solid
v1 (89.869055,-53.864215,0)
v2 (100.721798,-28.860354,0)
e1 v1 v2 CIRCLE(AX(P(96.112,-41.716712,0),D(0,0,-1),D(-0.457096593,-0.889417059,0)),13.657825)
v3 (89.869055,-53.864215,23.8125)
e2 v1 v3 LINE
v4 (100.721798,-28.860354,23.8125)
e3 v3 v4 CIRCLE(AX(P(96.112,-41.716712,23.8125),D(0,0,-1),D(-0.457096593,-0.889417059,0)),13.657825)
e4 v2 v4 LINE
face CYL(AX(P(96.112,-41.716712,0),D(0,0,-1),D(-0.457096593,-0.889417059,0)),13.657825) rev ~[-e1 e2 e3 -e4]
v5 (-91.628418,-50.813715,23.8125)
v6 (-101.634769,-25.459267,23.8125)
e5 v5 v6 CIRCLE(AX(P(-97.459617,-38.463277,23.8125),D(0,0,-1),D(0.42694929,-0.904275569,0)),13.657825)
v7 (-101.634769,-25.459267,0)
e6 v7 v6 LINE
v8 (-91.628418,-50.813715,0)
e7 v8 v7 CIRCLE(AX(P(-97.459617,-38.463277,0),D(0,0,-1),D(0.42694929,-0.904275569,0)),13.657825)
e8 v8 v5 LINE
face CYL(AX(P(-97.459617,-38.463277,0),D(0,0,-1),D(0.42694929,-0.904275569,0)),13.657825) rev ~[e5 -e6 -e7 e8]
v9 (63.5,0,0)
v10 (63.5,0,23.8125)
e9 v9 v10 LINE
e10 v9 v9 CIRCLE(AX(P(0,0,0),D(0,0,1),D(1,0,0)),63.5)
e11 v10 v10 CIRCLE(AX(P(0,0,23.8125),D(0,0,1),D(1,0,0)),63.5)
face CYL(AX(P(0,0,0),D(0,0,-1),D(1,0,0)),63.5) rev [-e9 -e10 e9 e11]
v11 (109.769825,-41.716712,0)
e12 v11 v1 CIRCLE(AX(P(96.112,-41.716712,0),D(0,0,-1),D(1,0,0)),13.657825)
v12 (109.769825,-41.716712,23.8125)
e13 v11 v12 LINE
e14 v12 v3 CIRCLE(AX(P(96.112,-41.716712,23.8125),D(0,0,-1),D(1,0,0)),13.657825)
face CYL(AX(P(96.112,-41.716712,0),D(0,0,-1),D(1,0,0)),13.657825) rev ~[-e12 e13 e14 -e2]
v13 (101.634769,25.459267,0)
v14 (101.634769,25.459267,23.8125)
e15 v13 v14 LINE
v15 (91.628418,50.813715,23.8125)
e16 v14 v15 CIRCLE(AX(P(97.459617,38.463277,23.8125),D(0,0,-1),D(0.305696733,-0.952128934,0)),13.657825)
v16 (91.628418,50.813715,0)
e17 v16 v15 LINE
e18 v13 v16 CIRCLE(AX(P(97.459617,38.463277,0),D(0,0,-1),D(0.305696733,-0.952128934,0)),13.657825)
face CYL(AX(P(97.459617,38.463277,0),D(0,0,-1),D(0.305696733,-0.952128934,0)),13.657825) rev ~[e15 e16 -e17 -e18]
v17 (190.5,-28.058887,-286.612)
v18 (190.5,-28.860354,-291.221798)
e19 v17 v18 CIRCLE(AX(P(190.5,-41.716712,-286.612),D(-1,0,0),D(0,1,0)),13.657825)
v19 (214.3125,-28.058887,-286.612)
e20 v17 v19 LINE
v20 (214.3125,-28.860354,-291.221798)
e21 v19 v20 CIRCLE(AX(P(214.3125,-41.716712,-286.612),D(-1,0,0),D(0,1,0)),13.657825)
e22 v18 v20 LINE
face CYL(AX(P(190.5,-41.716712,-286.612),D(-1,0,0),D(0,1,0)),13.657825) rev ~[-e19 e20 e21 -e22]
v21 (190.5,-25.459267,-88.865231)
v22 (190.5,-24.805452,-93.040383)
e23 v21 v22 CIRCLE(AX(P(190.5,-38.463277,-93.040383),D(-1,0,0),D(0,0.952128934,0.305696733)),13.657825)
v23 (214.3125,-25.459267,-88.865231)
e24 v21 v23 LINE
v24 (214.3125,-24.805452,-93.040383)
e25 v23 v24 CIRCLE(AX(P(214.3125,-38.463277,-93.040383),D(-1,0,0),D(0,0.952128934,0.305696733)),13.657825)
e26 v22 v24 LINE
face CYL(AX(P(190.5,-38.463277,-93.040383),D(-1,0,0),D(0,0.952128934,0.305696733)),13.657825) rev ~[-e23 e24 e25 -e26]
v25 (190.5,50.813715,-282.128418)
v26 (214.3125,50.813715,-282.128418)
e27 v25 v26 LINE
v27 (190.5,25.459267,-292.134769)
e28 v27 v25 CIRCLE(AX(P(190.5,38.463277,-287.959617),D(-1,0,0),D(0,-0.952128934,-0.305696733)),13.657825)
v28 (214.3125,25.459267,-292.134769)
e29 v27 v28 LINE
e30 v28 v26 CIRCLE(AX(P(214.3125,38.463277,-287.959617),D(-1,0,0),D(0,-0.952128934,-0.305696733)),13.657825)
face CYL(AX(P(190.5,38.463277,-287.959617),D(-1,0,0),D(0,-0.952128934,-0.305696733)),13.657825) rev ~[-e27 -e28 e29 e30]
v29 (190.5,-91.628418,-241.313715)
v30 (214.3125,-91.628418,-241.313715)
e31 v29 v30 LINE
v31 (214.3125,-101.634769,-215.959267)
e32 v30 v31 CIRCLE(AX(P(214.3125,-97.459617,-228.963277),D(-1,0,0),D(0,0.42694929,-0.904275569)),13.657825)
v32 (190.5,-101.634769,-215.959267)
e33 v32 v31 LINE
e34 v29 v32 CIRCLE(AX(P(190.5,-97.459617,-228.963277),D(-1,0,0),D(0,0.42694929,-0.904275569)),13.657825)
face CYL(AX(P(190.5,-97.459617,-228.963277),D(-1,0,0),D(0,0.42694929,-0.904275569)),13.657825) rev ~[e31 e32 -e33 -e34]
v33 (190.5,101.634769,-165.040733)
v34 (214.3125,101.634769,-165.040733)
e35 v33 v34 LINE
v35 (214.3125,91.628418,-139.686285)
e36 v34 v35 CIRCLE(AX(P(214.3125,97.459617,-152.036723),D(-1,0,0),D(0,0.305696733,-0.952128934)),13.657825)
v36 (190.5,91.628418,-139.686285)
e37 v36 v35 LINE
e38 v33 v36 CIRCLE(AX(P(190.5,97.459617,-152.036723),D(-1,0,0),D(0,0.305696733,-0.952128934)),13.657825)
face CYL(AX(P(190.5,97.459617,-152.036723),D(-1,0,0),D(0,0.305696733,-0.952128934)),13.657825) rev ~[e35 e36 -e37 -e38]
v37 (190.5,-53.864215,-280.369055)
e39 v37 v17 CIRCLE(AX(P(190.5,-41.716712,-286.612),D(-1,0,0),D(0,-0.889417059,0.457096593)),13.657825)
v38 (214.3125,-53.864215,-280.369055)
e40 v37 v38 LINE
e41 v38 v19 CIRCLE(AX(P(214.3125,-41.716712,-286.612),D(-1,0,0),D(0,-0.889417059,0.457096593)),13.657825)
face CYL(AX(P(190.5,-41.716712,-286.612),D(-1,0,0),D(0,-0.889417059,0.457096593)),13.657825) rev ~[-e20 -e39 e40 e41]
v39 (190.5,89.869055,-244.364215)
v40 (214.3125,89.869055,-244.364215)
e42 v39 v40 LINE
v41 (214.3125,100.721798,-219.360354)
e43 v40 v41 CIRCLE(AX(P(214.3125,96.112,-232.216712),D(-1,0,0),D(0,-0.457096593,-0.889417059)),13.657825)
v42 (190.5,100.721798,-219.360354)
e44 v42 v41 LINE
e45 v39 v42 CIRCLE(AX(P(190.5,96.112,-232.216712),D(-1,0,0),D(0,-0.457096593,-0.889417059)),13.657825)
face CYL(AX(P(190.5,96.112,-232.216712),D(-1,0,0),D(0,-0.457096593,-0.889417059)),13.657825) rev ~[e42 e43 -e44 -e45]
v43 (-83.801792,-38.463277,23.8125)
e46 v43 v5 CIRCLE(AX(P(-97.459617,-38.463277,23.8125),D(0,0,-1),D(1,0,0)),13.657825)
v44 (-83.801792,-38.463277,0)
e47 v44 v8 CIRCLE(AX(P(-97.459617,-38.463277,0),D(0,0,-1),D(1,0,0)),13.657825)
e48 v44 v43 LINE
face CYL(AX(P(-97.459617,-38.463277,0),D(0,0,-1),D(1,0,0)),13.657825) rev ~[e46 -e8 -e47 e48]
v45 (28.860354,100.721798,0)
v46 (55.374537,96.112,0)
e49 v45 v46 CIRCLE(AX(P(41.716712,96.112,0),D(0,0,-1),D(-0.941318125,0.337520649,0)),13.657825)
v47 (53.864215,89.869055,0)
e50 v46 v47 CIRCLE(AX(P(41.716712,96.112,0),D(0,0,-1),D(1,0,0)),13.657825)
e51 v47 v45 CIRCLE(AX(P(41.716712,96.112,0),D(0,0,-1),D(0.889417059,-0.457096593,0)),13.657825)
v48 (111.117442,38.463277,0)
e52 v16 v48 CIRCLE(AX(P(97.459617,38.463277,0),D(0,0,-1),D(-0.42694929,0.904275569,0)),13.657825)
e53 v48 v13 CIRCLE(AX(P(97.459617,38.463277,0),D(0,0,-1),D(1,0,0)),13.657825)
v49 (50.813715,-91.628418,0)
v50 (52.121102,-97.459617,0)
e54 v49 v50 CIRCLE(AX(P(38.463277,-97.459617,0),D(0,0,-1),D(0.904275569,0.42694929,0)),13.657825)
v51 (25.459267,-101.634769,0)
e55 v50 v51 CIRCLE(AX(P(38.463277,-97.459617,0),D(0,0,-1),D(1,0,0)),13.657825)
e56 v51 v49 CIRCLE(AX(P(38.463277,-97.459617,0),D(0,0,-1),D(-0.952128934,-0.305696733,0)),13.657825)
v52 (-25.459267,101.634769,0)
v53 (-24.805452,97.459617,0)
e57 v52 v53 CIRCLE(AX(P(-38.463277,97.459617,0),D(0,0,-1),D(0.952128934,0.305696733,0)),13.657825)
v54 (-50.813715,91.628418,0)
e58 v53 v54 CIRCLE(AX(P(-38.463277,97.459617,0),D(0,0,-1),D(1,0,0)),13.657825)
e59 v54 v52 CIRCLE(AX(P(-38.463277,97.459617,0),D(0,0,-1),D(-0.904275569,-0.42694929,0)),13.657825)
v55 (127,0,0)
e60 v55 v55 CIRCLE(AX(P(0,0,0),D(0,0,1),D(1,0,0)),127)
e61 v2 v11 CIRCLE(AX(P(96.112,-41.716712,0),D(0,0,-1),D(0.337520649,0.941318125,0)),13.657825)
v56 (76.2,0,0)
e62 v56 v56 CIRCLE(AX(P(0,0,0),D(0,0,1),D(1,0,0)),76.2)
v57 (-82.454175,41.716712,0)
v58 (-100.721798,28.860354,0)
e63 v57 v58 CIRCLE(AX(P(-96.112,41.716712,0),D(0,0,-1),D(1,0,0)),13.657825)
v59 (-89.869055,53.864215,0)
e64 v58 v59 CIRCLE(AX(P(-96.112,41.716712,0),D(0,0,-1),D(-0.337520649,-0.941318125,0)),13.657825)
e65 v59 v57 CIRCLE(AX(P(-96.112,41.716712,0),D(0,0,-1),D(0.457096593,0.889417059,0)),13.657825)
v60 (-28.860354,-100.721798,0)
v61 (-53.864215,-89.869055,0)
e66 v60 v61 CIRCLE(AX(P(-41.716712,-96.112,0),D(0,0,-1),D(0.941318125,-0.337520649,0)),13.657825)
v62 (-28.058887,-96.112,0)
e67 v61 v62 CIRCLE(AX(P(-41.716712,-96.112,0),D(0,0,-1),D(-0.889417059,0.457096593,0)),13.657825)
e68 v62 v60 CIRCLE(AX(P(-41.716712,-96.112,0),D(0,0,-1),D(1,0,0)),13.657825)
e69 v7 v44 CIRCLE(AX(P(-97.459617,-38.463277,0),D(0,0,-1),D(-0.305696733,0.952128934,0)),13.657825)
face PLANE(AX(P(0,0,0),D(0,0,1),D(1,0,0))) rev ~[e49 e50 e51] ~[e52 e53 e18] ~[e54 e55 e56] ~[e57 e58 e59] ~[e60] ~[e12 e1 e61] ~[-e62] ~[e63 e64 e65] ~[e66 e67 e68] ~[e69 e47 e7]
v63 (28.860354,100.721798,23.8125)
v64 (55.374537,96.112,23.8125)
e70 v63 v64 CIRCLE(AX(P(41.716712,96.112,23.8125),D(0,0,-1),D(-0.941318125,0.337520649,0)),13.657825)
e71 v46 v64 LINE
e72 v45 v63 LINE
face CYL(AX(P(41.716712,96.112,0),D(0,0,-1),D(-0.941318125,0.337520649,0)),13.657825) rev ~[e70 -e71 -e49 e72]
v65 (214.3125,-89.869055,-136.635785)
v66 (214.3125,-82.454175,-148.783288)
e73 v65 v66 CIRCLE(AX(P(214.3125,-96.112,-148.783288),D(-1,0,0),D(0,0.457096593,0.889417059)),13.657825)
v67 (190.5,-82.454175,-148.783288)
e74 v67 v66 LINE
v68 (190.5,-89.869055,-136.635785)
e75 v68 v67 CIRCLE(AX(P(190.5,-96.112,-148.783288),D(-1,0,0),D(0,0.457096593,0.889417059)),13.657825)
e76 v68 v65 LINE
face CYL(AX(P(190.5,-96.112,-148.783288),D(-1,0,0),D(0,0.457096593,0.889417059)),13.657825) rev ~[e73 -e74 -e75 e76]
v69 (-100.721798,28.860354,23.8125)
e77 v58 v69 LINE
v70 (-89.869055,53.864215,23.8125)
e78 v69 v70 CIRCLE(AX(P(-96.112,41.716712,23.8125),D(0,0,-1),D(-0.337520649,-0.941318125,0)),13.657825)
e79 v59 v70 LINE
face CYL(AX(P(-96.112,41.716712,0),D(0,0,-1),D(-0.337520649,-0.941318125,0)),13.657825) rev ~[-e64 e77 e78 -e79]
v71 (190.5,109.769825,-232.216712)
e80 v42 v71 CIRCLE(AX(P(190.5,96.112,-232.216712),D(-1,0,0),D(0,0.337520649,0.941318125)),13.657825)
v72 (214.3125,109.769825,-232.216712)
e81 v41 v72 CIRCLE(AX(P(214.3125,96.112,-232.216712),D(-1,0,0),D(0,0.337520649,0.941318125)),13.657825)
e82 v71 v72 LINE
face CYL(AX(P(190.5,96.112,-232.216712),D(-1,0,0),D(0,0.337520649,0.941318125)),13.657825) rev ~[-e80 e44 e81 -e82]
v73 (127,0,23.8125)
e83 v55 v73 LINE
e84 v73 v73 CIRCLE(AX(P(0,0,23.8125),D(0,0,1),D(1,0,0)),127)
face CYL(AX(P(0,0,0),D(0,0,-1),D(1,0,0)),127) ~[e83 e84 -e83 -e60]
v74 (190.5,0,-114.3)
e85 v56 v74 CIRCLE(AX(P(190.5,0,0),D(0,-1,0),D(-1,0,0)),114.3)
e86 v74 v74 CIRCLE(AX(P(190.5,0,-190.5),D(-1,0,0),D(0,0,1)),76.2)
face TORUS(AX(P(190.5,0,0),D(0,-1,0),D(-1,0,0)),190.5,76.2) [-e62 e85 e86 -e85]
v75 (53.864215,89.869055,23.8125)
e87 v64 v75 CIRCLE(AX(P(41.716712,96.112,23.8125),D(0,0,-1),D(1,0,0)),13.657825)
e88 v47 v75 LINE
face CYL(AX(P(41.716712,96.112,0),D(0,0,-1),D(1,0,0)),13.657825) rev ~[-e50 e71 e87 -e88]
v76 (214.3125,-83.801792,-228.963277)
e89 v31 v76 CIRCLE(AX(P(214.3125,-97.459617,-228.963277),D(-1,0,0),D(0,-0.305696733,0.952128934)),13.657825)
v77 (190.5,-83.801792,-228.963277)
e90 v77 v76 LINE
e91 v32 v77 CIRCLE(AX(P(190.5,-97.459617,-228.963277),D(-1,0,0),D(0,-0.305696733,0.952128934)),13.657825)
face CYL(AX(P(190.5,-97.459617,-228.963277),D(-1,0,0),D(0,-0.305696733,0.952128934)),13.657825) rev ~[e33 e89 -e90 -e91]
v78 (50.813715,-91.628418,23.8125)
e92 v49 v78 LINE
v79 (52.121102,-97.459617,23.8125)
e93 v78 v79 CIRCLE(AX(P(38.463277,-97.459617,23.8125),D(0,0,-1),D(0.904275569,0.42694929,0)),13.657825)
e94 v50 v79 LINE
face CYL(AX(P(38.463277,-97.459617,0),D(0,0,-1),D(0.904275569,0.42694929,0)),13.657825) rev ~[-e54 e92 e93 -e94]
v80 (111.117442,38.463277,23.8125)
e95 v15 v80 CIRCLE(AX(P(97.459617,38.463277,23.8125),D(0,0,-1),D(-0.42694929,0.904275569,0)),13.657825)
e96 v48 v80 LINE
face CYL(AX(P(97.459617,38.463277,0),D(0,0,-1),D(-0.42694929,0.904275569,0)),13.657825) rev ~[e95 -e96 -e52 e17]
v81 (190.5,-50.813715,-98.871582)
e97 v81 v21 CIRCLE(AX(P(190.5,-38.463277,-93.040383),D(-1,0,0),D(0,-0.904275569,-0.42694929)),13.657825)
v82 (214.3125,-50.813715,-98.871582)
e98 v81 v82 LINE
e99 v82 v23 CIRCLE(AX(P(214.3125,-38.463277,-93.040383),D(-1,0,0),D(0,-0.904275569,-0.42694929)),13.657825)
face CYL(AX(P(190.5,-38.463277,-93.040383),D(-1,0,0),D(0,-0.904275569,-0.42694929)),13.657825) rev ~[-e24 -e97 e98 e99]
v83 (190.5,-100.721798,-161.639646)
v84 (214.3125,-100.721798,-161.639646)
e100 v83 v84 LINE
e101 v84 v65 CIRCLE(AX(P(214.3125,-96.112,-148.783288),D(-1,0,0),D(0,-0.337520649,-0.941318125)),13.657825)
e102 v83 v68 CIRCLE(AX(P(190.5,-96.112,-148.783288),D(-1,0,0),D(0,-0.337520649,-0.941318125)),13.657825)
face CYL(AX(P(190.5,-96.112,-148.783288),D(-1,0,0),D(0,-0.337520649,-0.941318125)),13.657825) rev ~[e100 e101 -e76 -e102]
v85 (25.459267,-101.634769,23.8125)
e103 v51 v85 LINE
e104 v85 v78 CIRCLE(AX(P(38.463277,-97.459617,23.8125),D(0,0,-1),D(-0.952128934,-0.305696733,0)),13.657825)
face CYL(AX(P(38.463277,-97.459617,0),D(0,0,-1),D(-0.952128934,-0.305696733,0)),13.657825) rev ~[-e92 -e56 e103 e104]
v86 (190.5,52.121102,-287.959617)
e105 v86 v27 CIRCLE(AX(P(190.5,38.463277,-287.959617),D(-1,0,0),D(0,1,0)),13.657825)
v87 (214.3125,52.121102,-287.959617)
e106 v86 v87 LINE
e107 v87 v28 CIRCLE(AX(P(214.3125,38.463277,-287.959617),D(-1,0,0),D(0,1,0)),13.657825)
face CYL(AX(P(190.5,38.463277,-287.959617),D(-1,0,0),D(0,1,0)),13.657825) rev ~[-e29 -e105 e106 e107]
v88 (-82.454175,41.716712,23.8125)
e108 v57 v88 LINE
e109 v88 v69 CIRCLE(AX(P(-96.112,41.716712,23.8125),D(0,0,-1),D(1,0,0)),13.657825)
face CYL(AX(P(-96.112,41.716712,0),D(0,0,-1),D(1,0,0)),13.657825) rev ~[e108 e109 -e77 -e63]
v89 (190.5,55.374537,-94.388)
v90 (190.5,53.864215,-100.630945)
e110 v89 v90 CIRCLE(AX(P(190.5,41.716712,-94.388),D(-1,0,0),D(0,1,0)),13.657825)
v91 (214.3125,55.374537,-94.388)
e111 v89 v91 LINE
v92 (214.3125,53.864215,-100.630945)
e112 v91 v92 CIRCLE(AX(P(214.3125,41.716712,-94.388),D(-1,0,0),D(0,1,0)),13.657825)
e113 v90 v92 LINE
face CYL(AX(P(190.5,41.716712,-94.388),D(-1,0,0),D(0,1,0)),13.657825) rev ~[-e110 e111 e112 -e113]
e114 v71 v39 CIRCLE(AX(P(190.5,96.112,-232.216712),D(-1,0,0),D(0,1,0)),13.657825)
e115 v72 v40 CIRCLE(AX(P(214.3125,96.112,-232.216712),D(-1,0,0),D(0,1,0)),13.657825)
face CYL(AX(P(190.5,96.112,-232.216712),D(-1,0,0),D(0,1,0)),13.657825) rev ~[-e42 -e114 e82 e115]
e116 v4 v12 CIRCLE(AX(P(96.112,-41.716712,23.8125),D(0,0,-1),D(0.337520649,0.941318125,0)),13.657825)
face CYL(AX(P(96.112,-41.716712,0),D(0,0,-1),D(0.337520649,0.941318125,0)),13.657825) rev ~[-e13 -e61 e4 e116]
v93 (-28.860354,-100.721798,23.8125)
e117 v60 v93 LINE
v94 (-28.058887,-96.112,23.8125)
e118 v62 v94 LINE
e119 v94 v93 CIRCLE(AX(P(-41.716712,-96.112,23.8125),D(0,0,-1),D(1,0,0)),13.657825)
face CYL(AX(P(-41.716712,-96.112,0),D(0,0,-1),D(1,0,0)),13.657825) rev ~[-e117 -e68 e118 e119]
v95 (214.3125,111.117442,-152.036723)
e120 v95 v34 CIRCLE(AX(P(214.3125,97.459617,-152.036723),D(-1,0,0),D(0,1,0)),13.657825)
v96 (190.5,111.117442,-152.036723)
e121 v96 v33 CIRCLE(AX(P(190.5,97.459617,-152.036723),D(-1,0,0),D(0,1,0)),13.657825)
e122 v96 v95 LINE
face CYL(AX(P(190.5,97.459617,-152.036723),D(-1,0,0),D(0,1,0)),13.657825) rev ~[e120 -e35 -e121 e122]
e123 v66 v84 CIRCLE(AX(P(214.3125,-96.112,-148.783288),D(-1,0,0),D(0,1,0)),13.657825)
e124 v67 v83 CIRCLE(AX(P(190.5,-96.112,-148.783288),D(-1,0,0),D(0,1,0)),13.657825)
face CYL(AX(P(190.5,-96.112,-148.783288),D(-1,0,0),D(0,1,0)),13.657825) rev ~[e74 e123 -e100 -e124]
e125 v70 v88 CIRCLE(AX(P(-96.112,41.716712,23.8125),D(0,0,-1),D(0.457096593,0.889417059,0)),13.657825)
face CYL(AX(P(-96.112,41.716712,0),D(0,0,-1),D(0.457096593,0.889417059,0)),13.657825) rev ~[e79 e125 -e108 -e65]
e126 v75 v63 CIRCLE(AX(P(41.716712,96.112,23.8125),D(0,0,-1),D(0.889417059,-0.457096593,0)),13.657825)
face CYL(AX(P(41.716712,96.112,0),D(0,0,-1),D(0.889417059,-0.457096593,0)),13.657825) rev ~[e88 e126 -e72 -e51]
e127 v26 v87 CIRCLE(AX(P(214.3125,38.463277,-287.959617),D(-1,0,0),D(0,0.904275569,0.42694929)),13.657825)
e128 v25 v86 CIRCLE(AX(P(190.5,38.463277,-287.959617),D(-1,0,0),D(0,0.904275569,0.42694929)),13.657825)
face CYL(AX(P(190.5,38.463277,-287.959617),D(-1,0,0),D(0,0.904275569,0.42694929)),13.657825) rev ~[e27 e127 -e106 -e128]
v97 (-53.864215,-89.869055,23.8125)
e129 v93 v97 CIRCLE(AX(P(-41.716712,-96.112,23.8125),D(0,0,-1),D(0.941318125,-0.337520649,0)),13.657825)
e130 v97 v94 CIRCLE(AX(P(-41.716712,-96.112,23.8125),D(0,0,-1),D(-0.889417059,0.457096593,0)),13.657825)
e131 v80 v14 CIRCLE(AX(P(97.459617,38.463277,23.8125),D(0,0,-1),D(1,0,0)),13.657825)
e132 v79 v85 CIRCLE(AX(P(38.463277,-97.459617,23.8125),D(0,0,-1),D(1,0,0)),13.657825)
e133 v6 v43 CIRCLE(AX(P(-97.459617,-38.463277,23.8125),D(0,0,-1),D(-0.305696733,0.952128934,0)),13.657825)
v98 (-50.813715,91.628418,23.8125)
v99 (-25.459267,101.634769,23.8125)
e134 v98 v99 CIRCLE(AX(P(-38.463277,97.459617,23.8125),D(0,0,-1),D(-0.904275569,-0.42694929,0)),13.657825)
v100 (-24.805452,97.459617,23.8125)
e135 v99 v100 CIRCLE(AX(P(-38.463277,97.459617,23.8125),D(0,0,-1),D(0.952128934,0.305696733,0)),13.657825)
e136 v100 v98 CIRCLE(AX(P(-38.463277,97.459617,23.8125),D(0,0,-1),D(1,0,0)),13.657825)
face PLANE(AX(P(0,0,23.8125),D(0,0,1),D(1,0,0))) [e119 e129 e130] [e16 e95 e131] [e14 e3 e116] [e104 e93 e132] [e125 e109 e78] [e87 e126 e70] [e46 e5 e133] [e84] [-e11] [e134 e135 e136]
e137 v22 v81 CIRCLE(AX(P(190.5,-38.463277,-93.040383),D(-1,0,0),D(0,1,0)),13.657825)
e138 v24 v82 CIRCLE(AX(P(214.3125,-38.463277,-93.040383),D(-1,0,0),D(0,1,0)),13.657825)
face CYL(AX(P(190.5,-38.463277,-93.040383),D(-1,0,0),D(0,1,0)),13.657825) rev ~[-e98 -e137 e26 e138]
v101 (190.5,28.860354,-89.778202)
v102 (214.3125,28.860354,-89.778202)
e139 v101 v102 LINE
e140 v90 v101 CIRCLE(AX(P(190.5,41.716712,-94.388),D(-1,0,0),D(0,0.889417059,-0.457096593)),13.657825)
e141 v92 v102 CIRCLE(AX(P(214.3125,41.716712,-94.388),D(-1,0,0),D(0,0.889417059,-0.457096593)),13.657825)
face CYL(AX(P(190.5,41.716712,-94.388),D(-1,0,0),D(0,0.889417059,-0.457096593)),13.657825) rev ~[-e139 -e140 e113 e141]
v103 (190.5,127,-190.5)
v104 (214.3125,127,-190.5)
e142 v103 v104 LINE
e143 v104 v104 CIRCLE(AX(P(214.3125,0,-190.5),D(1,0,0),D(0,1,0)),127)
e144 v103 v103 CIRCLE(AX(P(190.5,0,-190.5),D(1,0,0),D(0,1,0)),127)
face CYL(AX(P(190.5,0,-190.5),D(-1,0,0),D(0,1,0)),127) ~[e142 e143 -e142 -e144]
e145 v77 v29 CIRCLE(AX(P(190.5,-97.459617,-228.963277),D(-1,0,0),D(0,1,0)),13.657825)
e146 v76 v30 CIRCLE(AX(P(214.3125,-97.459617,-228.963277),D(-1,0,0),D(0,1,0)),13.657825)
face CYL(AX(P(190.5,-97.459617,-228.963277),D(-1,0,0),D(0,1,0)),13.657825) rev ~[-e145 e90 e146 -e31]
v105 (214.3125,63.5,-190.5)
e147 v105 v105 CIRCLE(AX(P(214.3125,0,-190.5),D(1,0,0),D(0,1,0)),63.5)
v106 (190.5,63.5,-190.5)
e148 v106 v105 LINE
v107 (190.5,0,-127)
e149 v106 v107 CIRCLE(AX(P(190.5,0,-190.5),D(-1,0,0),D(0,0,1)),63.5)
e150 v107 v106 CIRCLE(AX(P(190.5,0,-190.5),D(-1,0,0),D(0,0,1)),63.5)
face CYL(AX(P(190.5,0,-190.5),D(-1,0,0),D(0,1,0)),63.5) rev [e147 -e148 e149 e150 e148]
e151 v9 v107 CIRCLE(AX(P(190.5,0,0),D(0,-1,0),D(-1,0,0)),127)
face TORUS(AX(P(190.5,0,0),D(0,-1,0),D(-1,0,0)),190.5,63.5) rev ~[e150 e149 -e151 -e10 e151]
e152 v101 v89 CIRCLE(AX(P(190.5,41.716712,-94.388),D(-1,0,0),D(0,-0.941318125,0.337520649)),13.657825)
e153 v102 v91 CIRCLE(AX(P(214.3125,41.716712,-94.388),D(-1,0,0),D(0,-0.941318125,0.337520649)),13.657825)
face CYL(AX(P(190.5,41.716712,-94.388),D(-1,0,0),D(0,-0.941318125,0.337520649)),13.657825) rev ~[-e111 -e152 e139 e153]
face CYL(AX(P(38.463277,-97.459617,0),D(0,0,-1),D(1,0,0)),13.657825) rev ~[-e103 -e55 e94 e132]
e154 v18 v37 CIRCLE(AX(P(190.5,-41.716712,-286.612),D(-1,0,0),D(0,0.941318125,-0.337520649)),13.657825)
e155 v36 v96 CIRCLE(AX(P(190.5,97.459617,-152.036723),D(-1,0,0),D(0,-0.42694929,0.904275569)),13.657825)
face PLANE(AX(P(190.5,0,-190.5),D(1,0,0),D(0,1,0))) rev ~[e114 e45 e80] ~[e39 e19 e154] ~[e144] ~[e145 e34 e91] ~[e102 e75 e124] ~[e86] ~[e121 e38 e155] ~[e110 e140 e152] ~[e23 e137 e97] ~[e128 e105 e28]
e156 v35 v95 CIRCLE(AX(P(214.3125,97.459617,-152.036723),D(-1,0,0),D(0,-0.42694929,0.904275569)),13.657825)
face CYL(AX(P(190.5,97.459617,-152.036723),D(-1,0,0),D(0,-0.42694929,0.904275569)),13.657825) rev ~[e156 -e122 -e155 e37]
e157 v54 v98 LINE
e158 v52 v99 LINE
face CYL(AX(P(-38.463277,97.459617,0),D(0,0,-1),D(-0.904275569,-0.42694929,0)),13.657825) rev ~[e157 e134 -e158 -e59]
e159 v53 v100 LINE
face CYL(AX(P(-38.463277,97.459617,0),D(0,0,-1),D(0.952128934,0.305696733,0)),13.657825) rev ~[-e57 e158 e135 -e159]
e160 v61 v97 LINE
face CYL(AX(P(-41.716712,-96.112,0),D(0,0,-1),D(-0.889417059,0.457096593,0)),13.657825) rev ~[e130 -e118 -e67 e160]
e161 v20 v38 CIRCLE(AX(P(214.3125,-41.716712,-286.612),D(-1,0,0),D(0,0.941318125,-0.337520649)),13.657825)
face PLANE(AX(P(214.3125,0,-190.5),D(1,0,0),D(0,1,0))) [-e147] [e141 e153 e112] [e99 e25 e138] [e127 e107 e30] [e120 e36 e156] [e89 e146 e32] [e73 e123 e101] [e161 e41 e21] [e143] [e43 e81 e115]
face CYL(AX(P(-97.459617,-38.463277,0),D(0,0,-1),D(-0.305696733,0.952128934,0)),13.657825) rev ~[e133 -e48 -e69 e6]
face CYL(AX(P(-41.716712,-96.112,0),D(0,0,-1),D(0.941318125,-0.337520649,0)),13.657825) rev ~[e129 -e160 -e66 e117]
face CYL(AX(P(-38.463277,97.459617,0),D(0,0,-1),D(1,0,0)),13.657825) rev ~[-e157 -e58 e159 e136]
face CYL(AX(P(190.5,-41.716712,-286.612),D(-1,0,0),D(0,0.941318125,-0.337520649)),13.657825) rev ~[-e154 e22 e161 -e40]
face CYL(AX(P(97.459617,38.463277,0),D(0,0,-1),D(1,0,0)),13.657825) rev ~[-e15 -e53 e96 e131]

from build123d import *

# Parameters (mm, degrees)
F0_R     = 127
F0_R_2   = 76.2
F0_R_3   = 63.5
F1_DEPTH = 23.8125
F2_ANGLE = 90
F3_R     = 127
F3_R_2   = 76.2
F3_R_3   = 63.5
F4_DEPTH = 23.8125


with BuildPart() as f1:
    # F0 (on Top) → F1 (new body)
    with BuildSketch(Plane.XY):
        Circle(F0_R)
        with BuildLine():
            ThreePointArc((28.8603537964, 100.7217980566), (44.0561876825, 109.567966691), (55.3745369645, 96.1120001135))
            ThreePointArc((55.3745369645, 96.1120001135), (54.9915876268, 92.9004802457), (53.8642145113, 89.8690548525))
            ThreePointArc((53.8642145113, 89.8690548525), (75.3216864654, 72.8316152026), (91.628418296, 50.8137145422))
            ThreePointArc((91.628418296, 50.8137145422), (104.7703861556, 49.9996906202), (111.1174419453, 38.4632770973))
            ThreePointArc((111.1174419453, 38.4632770973), (108.4950074221, 30.41614465), (101.6347694492, 25.4592667608))
            ThreePointArc((101.6347694492, 25.4592667608), (103.9869789782, 12.8260994842), (104.775, 0))
            ThreePointArc((104.775, 0), (103.756751627, -14.5717918189), (100.7217980566, -28.8603537964))
            ThreePointArc((100.7217980565, -28.8603537964), (107.2810644551, -33.856165902), (109.7698250888, -41.7167119892))
            ThreePointArc((109.7698250888, -41.7167119892), (103.2278672199, -53.3743540483), (89.8690548525, -53.8642145113))
            ThreePointArc((89.8690548525, -53.8642145113), (72.8316152026, -75.3216864654), (50.8137145422, -91.628418296))
            ThreePointArc((50.8137145422, -91.628418296), (51.7902477967, -94.4716352042), (52.1211020726, -97.45961697))
            ThreePointArc((52.1211020726, -97.45961697), (40.5762945965, -110.9529983143), (25.4592667608, -101.6347694492))
            ThreePointArc((25.4592667608, -101.6347694492), (-1.7607462756, -104.7602042646), (-28.8603537964, -100.7217980566))
            ThreePointArc((-28.8603537964, -100.7217980566), (-47.1546461423, -108.6405696728), (-53.8642145113, -89.8690548525))
            ThreePointArc((-53.8642145113, -89.8690548525), (-75.3216864654, -72.8316152026), (-91.628418296, -50.8137145422))
            ThreePointArc((-91.628418296, -50.8137145422), (-110.1638535792, -43.4771134759), (-101.6347694492, -25.4592667608))
            ThreePointArc((-101.6347694492, -25.4592667608), (-104.7602042646, 1.7607462756), (-100.7217980566, 28.8603537964))
            ThreePointArc((-100.7217980565, 28.8603537964), (-108.6405696728, 47.1546461423), (-89.8690548525, 53.8642145113))
            ThreePointArc((-89.8690548525, 53.8642145113), (-72.8316152026, 75.3216864654), (-50.8137145422, 91.628418296))
            ThreePointArc((-50.8137145422, 91.628418296), (-43.4771134759, 110.1638535792), (-25.4592667608, 101.6347694492))
            ThreePointArc((-25.4592667608, 101.6347694492), (1.7607462756, 104.7602042646), (28.8603537964, 100.7217980566))
        make_face(mode=Mode.SUBTRACT)
        with BuildLine():
            ThreePointArc((53.8642145113, 89.8690548525), (36.278777836, 83.5834305542), (28.8603537964, 100.7217980566))
            ThreePointArc((28.8603537964, 100.7217980566), (1.7607462756, 104.7602042646), (-25.4592667608, 101.6347694492))
            ThreePointArc((-25.4592667608, 101.6347694492), (-24.969895753, 99.5726344691), (-24.805452122, 97.45961697))
            ThreePointArc((-24.805452122, 97.45961697), (-35.4752953315, 84.1326462706), (-50.8137145422, 91.628418296))
            ThreePointArc((-50.8137145422, 91.628418296), (-72.8316152026, 75.3216864654), (-89.8690548525, 53.8642145113))
            ThreePointArc((-89.8690548525, 53.8642145113), (-84.4543580543, 48.8325790955), (-82.4541751382, 41.7167119892))
            ThreePointArc((-82.4541751382, 41.7167119892), (-88.2514540263, 30.5476476476), (-100.7217980565, 28.8603537964))
            ThreePointArc((-100.7217980566, 28.8603537964), (-104.7602042646, 1.7607462756), (-101.6347694492, -25.4592667608))
            ThreePointArc((-101.6347694492, -25.4592667608), (-89.4124845227, -27.4278866452), (-83.8017919947, -38.4632770973))
            ThreePointArc((-83.8017919947, -38.4632770973), (-85.9232034471, -45.7740462829), (-91.628418296, -50.8137145422))
            ThreePointArc((-91.628418296, -50.8137145422), (-75.3216864654, -72.8316152026), (-53.8642145113, -89.8690548525))
            ThreePointArc((-53.8642145113, -89.8690548525), (-38.5051921214, -82.8371244758), (-28.0588870139, -96.1120001135))
            ThreePointArc((-28.0588870139, -96.1120001135), (-28.2607454116, -98.4514758068), (-28.8603537964, -100.7217980566))
            ThreePointArc((-28.8603537964, -100.7217980566), (-1.7607462756, -104.7602042646), (25.4592667608, -101.6347694492))
            ThreePointArc((25.4592667608, -101.6347694492), (33.4494407187, -84.7553803607), (50.8137145422, -91.628418296))
            ThreePointArc((50.8137145422, -91.628418296), (72.8316152026, -75.3216864654), (89.8690548525, -53.8642145113))
            ThreePointArc((89.8690548525, -53.8642145113), (83.5834305542, -36.278777836), (100.7217980565, -28.8603537964))
            ThreePointArc((100.7217980566, -28.8603537964), (103.756751627, -14.5717918189), (104.775, 0))
            ThreePointArc((104.775, 0), (103.9869789782, 12.8260994842), (101.6347694492, 25.4592667608))
            ThreePointArc((101.6347694492, 25.4592667608), (84.7553803607, 33.4494407187), (91.628418296, 50.8137145422))
            ThreePointArc((91.628418296, 50.8137145422), (75.3216864654, 72.8316152026), (53.8642145113, 89.8690548525))
        make_face()
        Circle(F0_R_2, mode=Mode.SUBTRACT)
        Circle(F0_R_2)
        Circle(F0_R_3, mode=Mode.SUBTRACT)
    extrude(amount=F1_DEPTH)

    # F0 (on Top) → F2 (revolve)
    with BuildSketch(Plane.XY):
        Circle(F0_R_2)
        Circle(F0_R_3, mode=Mode.SUBTRACT)
    revolve(axis=Axis((190.5, -17.9878585041, 0), (0, -1, 0)), revolution_arc=F2_ANGLE)

    # F3 (on face) → F4 (join)
    with BuildSketch(Plane.YZ.offset(190.5)):
        with Locations((0, -190.5)):
            Circle(F3_R)
        with BuildLine():
            ThreePointArc((28.8603537964, -89.7782019434), (44.0561876825, -80.932033309), (55.3745369645, -94.3879998865))
            ThreePointArc((55.3745369645, -94.3879998865), (54.9915876268, -97.5995197543), (53.8642145113, -100.6309451475))
            ThreePointArc((53.8642145113, -100.6309451475), (75.3216864654, -117.6683847974), (91.628418296, -139.6862854578))
            ThreePointArc((91.628418296, -139.6862854578), (104.7703861556, -140.5003093798), (111.1174419453, -152.0367229027))
            ThreePointArc((111.1174419453, -152.0367229027), (108.4950074221, -160.08385535), (101.6347694492, -165.0407332392))
            ThreePointArc((101.6347694492, -165.0407332392), (103.9869789782, -177.6739005158), (104.775, -190.5))
            ThreePointArc((104.775, -190.5), (103.756751627, -205.0717918189), (100.7217980566, -219.3603537964))
            ThreePointArc((100.7217980565, -219.3603537964), (107.2810644551, -224.356165902), (109.7698250888, -232.2167119892))
            ThreePointArc((109.7698250888, -232.2167119892), (103.2278672199, -243.8743540483), (89.8690548525, -244.3642145113))
            ThreePointArc((89.8690548525, -244.3642145113), (72.8316152026, -265.8216864654), (50.8137145422, -282.128418296))
            ThreePointArc((50.8137145422, -282.128418296), (51.7902477967, -284.9716352042), (52.1211020726, -287.95961697))
            ThreePointArc((52.1211020726, -287.95961697), (40.5762945965, -301.4529983143), (25.4592667608, -292.1347694492))
            ThreePointArc((25.4592667608, -292.1347694492), (-1.7607462756, -295.2602042646), (-28.8603537964, -291.2217980566))
            ThreePointArc((-28.8603537964, -291.2217980566), (-47.1546461423, -299.1405696728), (-53.8642145113, -280.3690548525))
            ThreePointArc((-53.8642145113, -280.3690548525), (-75.3216864654, -263.3316152026), (-91.628418296, -241.3137145422))
            ThreePointArc((-91.628418296, -241.3137145422), (-110.1638535792, -233.9771134759), (-101.6347694492, -215.9592667608))
            ThreePointArc((-101.6347694492, -215.9592667608), (-104.7602042646, -188.7392537244), (-100.7217980566, -161.6396462036))
            ThreePointArc((-100.7217980565, -161.6396462036), (-108.6405696728, -143.3453538577), (-89.8690548525, -136.6357854887))
            ThreePointArc((-89.8690548525, -136.6357854887), (-72.8316152026, -115.1783135346), (-50.8137145422, -98.871581704))
            ThreePointArc((-50.8137145422, -98.871581704), (-43.4771134759, -80.3361464208), (-25.4592667608, -88.8652305508))
            ThreePointArc((-25.4592667608, -88.8652305508), (1.7607462756, -85.7397957354), (28.8603537964, -89.7782019434))
        make_face(mode=Mode.SUBTRACT)
        with BuildLine():
            ThreePointArc((53.8642145113, -100.6309451475), (36.278777836, -106.9165694458), (28.8603537964, -89.7782019434))
            ThreePointArc((28.8603537964, -89.7782019434), (1.7607462756, -85.7397957354), (-25.4592667608, -88.8652305508))
            ThreePointArc((-25.4592667608, -88.8652305508), (-24.969895753, -90.9273655309), (-24.805452122, -93.04038303))
            ThreePointArc((-24.805452122, -93.04038303), (-35.4752953315, -106.3673537294), (-50.8137145422, -98.871581704))
            ThreePointArc((-50.8137145422, -98.871581704), (-72.8316152026, -115.1783135346), (-89.8690548525, -136.6357854887))
            ThreePointArc((-89.8690548525, -136.6357854887), (-84.4543580543, -141.6674209045), (-82.4541751382, -148.7832880108))
            ThreePointArc((-82.4541751382, -148.7832880108), (-88.2514540263, -159.9523523524), (-100.7217980565, -161.6396462036))
            ThreePointArc((-100.7217980566, -161.6396462036), (-104.7602042646, -188.7392537244), (-101.6347694492, -215.9592667608))
            ThreePointArc((-101.6347694492, -215.9592667608), (-89.4124845227, -217.9278866452), (-83.8017919947, -228.9632770973))
            ThreePointArc((-83.8017919947, -228.9632770973), (-85.9232034471, -236.2740462829), (-91.628418296, -241.3137145422))
            ThreePointArc((-91.628418296, -241.3137145422), (-75.3216864654, -263.3316152026), (-53.8642145113, -280.3690548525))
            ThreePointArc((-53.8642145113, -280.3690548525), (-38.5051921214, -273.3371244758), (-28.0588870139, -286.6120001135))
            ThreePointArc((-28.0588870139, -286.6120001135), (-28.2607454116, -288.9514758068), (-28.8603537964, -291.2217980566))
            ThreePointArc((-28.8603537964, -291.2217980566), (-1.7607462756, -295.2602042646), (25.4592667608, -292.1347694492))
            ThreePointArc((25.4592667608, -292.1347694492), (33.4494407187, -275.2553803607), (50.8137145422, -282.128418296))
            ThreePointArc((50.8137145422, -282.128418296), (72.8316152026, -265.8216864654), (89.8690548525, -244.3642145113))
            ThreePointArc((89.8690548525, -244.3642145113), (83.5834305542, -226.778777836), (100.7217980565, -219.3603537964))
            ThreePointArc((100.7217980566, -219.3603537964), (103.756751627, -205.0717918189), (104.775, -190.5))
            ThreePointArc((104.775, -190.5), (103.9869789782, -177.6739005158), (101.6347694492, -165.0407332392))
            ThreePointArc((101.6347694492, -165.0407332392), (84.7553803607, -157.0505592813), (91.628418296, -139.6862854578))
            ThreePointArc((91.628418296, -139.6862854578), (75.3216864654, -117.6683847974), (53.8642145113, -100.6309451475))
        make_face()
        with Locations((0, -190.5)):
            Circle(F3_R_2, mode=Mode.SUBTRACT)
        with Locations((0, -190.5)):
            Circle(F3_R_2)
        with Locations((0, -190.5)):
            Circle(F3_R_3, mode=Mode.SUBTRACT)
    extrude(amount=F4_DEPTH)


solid = f1.part
